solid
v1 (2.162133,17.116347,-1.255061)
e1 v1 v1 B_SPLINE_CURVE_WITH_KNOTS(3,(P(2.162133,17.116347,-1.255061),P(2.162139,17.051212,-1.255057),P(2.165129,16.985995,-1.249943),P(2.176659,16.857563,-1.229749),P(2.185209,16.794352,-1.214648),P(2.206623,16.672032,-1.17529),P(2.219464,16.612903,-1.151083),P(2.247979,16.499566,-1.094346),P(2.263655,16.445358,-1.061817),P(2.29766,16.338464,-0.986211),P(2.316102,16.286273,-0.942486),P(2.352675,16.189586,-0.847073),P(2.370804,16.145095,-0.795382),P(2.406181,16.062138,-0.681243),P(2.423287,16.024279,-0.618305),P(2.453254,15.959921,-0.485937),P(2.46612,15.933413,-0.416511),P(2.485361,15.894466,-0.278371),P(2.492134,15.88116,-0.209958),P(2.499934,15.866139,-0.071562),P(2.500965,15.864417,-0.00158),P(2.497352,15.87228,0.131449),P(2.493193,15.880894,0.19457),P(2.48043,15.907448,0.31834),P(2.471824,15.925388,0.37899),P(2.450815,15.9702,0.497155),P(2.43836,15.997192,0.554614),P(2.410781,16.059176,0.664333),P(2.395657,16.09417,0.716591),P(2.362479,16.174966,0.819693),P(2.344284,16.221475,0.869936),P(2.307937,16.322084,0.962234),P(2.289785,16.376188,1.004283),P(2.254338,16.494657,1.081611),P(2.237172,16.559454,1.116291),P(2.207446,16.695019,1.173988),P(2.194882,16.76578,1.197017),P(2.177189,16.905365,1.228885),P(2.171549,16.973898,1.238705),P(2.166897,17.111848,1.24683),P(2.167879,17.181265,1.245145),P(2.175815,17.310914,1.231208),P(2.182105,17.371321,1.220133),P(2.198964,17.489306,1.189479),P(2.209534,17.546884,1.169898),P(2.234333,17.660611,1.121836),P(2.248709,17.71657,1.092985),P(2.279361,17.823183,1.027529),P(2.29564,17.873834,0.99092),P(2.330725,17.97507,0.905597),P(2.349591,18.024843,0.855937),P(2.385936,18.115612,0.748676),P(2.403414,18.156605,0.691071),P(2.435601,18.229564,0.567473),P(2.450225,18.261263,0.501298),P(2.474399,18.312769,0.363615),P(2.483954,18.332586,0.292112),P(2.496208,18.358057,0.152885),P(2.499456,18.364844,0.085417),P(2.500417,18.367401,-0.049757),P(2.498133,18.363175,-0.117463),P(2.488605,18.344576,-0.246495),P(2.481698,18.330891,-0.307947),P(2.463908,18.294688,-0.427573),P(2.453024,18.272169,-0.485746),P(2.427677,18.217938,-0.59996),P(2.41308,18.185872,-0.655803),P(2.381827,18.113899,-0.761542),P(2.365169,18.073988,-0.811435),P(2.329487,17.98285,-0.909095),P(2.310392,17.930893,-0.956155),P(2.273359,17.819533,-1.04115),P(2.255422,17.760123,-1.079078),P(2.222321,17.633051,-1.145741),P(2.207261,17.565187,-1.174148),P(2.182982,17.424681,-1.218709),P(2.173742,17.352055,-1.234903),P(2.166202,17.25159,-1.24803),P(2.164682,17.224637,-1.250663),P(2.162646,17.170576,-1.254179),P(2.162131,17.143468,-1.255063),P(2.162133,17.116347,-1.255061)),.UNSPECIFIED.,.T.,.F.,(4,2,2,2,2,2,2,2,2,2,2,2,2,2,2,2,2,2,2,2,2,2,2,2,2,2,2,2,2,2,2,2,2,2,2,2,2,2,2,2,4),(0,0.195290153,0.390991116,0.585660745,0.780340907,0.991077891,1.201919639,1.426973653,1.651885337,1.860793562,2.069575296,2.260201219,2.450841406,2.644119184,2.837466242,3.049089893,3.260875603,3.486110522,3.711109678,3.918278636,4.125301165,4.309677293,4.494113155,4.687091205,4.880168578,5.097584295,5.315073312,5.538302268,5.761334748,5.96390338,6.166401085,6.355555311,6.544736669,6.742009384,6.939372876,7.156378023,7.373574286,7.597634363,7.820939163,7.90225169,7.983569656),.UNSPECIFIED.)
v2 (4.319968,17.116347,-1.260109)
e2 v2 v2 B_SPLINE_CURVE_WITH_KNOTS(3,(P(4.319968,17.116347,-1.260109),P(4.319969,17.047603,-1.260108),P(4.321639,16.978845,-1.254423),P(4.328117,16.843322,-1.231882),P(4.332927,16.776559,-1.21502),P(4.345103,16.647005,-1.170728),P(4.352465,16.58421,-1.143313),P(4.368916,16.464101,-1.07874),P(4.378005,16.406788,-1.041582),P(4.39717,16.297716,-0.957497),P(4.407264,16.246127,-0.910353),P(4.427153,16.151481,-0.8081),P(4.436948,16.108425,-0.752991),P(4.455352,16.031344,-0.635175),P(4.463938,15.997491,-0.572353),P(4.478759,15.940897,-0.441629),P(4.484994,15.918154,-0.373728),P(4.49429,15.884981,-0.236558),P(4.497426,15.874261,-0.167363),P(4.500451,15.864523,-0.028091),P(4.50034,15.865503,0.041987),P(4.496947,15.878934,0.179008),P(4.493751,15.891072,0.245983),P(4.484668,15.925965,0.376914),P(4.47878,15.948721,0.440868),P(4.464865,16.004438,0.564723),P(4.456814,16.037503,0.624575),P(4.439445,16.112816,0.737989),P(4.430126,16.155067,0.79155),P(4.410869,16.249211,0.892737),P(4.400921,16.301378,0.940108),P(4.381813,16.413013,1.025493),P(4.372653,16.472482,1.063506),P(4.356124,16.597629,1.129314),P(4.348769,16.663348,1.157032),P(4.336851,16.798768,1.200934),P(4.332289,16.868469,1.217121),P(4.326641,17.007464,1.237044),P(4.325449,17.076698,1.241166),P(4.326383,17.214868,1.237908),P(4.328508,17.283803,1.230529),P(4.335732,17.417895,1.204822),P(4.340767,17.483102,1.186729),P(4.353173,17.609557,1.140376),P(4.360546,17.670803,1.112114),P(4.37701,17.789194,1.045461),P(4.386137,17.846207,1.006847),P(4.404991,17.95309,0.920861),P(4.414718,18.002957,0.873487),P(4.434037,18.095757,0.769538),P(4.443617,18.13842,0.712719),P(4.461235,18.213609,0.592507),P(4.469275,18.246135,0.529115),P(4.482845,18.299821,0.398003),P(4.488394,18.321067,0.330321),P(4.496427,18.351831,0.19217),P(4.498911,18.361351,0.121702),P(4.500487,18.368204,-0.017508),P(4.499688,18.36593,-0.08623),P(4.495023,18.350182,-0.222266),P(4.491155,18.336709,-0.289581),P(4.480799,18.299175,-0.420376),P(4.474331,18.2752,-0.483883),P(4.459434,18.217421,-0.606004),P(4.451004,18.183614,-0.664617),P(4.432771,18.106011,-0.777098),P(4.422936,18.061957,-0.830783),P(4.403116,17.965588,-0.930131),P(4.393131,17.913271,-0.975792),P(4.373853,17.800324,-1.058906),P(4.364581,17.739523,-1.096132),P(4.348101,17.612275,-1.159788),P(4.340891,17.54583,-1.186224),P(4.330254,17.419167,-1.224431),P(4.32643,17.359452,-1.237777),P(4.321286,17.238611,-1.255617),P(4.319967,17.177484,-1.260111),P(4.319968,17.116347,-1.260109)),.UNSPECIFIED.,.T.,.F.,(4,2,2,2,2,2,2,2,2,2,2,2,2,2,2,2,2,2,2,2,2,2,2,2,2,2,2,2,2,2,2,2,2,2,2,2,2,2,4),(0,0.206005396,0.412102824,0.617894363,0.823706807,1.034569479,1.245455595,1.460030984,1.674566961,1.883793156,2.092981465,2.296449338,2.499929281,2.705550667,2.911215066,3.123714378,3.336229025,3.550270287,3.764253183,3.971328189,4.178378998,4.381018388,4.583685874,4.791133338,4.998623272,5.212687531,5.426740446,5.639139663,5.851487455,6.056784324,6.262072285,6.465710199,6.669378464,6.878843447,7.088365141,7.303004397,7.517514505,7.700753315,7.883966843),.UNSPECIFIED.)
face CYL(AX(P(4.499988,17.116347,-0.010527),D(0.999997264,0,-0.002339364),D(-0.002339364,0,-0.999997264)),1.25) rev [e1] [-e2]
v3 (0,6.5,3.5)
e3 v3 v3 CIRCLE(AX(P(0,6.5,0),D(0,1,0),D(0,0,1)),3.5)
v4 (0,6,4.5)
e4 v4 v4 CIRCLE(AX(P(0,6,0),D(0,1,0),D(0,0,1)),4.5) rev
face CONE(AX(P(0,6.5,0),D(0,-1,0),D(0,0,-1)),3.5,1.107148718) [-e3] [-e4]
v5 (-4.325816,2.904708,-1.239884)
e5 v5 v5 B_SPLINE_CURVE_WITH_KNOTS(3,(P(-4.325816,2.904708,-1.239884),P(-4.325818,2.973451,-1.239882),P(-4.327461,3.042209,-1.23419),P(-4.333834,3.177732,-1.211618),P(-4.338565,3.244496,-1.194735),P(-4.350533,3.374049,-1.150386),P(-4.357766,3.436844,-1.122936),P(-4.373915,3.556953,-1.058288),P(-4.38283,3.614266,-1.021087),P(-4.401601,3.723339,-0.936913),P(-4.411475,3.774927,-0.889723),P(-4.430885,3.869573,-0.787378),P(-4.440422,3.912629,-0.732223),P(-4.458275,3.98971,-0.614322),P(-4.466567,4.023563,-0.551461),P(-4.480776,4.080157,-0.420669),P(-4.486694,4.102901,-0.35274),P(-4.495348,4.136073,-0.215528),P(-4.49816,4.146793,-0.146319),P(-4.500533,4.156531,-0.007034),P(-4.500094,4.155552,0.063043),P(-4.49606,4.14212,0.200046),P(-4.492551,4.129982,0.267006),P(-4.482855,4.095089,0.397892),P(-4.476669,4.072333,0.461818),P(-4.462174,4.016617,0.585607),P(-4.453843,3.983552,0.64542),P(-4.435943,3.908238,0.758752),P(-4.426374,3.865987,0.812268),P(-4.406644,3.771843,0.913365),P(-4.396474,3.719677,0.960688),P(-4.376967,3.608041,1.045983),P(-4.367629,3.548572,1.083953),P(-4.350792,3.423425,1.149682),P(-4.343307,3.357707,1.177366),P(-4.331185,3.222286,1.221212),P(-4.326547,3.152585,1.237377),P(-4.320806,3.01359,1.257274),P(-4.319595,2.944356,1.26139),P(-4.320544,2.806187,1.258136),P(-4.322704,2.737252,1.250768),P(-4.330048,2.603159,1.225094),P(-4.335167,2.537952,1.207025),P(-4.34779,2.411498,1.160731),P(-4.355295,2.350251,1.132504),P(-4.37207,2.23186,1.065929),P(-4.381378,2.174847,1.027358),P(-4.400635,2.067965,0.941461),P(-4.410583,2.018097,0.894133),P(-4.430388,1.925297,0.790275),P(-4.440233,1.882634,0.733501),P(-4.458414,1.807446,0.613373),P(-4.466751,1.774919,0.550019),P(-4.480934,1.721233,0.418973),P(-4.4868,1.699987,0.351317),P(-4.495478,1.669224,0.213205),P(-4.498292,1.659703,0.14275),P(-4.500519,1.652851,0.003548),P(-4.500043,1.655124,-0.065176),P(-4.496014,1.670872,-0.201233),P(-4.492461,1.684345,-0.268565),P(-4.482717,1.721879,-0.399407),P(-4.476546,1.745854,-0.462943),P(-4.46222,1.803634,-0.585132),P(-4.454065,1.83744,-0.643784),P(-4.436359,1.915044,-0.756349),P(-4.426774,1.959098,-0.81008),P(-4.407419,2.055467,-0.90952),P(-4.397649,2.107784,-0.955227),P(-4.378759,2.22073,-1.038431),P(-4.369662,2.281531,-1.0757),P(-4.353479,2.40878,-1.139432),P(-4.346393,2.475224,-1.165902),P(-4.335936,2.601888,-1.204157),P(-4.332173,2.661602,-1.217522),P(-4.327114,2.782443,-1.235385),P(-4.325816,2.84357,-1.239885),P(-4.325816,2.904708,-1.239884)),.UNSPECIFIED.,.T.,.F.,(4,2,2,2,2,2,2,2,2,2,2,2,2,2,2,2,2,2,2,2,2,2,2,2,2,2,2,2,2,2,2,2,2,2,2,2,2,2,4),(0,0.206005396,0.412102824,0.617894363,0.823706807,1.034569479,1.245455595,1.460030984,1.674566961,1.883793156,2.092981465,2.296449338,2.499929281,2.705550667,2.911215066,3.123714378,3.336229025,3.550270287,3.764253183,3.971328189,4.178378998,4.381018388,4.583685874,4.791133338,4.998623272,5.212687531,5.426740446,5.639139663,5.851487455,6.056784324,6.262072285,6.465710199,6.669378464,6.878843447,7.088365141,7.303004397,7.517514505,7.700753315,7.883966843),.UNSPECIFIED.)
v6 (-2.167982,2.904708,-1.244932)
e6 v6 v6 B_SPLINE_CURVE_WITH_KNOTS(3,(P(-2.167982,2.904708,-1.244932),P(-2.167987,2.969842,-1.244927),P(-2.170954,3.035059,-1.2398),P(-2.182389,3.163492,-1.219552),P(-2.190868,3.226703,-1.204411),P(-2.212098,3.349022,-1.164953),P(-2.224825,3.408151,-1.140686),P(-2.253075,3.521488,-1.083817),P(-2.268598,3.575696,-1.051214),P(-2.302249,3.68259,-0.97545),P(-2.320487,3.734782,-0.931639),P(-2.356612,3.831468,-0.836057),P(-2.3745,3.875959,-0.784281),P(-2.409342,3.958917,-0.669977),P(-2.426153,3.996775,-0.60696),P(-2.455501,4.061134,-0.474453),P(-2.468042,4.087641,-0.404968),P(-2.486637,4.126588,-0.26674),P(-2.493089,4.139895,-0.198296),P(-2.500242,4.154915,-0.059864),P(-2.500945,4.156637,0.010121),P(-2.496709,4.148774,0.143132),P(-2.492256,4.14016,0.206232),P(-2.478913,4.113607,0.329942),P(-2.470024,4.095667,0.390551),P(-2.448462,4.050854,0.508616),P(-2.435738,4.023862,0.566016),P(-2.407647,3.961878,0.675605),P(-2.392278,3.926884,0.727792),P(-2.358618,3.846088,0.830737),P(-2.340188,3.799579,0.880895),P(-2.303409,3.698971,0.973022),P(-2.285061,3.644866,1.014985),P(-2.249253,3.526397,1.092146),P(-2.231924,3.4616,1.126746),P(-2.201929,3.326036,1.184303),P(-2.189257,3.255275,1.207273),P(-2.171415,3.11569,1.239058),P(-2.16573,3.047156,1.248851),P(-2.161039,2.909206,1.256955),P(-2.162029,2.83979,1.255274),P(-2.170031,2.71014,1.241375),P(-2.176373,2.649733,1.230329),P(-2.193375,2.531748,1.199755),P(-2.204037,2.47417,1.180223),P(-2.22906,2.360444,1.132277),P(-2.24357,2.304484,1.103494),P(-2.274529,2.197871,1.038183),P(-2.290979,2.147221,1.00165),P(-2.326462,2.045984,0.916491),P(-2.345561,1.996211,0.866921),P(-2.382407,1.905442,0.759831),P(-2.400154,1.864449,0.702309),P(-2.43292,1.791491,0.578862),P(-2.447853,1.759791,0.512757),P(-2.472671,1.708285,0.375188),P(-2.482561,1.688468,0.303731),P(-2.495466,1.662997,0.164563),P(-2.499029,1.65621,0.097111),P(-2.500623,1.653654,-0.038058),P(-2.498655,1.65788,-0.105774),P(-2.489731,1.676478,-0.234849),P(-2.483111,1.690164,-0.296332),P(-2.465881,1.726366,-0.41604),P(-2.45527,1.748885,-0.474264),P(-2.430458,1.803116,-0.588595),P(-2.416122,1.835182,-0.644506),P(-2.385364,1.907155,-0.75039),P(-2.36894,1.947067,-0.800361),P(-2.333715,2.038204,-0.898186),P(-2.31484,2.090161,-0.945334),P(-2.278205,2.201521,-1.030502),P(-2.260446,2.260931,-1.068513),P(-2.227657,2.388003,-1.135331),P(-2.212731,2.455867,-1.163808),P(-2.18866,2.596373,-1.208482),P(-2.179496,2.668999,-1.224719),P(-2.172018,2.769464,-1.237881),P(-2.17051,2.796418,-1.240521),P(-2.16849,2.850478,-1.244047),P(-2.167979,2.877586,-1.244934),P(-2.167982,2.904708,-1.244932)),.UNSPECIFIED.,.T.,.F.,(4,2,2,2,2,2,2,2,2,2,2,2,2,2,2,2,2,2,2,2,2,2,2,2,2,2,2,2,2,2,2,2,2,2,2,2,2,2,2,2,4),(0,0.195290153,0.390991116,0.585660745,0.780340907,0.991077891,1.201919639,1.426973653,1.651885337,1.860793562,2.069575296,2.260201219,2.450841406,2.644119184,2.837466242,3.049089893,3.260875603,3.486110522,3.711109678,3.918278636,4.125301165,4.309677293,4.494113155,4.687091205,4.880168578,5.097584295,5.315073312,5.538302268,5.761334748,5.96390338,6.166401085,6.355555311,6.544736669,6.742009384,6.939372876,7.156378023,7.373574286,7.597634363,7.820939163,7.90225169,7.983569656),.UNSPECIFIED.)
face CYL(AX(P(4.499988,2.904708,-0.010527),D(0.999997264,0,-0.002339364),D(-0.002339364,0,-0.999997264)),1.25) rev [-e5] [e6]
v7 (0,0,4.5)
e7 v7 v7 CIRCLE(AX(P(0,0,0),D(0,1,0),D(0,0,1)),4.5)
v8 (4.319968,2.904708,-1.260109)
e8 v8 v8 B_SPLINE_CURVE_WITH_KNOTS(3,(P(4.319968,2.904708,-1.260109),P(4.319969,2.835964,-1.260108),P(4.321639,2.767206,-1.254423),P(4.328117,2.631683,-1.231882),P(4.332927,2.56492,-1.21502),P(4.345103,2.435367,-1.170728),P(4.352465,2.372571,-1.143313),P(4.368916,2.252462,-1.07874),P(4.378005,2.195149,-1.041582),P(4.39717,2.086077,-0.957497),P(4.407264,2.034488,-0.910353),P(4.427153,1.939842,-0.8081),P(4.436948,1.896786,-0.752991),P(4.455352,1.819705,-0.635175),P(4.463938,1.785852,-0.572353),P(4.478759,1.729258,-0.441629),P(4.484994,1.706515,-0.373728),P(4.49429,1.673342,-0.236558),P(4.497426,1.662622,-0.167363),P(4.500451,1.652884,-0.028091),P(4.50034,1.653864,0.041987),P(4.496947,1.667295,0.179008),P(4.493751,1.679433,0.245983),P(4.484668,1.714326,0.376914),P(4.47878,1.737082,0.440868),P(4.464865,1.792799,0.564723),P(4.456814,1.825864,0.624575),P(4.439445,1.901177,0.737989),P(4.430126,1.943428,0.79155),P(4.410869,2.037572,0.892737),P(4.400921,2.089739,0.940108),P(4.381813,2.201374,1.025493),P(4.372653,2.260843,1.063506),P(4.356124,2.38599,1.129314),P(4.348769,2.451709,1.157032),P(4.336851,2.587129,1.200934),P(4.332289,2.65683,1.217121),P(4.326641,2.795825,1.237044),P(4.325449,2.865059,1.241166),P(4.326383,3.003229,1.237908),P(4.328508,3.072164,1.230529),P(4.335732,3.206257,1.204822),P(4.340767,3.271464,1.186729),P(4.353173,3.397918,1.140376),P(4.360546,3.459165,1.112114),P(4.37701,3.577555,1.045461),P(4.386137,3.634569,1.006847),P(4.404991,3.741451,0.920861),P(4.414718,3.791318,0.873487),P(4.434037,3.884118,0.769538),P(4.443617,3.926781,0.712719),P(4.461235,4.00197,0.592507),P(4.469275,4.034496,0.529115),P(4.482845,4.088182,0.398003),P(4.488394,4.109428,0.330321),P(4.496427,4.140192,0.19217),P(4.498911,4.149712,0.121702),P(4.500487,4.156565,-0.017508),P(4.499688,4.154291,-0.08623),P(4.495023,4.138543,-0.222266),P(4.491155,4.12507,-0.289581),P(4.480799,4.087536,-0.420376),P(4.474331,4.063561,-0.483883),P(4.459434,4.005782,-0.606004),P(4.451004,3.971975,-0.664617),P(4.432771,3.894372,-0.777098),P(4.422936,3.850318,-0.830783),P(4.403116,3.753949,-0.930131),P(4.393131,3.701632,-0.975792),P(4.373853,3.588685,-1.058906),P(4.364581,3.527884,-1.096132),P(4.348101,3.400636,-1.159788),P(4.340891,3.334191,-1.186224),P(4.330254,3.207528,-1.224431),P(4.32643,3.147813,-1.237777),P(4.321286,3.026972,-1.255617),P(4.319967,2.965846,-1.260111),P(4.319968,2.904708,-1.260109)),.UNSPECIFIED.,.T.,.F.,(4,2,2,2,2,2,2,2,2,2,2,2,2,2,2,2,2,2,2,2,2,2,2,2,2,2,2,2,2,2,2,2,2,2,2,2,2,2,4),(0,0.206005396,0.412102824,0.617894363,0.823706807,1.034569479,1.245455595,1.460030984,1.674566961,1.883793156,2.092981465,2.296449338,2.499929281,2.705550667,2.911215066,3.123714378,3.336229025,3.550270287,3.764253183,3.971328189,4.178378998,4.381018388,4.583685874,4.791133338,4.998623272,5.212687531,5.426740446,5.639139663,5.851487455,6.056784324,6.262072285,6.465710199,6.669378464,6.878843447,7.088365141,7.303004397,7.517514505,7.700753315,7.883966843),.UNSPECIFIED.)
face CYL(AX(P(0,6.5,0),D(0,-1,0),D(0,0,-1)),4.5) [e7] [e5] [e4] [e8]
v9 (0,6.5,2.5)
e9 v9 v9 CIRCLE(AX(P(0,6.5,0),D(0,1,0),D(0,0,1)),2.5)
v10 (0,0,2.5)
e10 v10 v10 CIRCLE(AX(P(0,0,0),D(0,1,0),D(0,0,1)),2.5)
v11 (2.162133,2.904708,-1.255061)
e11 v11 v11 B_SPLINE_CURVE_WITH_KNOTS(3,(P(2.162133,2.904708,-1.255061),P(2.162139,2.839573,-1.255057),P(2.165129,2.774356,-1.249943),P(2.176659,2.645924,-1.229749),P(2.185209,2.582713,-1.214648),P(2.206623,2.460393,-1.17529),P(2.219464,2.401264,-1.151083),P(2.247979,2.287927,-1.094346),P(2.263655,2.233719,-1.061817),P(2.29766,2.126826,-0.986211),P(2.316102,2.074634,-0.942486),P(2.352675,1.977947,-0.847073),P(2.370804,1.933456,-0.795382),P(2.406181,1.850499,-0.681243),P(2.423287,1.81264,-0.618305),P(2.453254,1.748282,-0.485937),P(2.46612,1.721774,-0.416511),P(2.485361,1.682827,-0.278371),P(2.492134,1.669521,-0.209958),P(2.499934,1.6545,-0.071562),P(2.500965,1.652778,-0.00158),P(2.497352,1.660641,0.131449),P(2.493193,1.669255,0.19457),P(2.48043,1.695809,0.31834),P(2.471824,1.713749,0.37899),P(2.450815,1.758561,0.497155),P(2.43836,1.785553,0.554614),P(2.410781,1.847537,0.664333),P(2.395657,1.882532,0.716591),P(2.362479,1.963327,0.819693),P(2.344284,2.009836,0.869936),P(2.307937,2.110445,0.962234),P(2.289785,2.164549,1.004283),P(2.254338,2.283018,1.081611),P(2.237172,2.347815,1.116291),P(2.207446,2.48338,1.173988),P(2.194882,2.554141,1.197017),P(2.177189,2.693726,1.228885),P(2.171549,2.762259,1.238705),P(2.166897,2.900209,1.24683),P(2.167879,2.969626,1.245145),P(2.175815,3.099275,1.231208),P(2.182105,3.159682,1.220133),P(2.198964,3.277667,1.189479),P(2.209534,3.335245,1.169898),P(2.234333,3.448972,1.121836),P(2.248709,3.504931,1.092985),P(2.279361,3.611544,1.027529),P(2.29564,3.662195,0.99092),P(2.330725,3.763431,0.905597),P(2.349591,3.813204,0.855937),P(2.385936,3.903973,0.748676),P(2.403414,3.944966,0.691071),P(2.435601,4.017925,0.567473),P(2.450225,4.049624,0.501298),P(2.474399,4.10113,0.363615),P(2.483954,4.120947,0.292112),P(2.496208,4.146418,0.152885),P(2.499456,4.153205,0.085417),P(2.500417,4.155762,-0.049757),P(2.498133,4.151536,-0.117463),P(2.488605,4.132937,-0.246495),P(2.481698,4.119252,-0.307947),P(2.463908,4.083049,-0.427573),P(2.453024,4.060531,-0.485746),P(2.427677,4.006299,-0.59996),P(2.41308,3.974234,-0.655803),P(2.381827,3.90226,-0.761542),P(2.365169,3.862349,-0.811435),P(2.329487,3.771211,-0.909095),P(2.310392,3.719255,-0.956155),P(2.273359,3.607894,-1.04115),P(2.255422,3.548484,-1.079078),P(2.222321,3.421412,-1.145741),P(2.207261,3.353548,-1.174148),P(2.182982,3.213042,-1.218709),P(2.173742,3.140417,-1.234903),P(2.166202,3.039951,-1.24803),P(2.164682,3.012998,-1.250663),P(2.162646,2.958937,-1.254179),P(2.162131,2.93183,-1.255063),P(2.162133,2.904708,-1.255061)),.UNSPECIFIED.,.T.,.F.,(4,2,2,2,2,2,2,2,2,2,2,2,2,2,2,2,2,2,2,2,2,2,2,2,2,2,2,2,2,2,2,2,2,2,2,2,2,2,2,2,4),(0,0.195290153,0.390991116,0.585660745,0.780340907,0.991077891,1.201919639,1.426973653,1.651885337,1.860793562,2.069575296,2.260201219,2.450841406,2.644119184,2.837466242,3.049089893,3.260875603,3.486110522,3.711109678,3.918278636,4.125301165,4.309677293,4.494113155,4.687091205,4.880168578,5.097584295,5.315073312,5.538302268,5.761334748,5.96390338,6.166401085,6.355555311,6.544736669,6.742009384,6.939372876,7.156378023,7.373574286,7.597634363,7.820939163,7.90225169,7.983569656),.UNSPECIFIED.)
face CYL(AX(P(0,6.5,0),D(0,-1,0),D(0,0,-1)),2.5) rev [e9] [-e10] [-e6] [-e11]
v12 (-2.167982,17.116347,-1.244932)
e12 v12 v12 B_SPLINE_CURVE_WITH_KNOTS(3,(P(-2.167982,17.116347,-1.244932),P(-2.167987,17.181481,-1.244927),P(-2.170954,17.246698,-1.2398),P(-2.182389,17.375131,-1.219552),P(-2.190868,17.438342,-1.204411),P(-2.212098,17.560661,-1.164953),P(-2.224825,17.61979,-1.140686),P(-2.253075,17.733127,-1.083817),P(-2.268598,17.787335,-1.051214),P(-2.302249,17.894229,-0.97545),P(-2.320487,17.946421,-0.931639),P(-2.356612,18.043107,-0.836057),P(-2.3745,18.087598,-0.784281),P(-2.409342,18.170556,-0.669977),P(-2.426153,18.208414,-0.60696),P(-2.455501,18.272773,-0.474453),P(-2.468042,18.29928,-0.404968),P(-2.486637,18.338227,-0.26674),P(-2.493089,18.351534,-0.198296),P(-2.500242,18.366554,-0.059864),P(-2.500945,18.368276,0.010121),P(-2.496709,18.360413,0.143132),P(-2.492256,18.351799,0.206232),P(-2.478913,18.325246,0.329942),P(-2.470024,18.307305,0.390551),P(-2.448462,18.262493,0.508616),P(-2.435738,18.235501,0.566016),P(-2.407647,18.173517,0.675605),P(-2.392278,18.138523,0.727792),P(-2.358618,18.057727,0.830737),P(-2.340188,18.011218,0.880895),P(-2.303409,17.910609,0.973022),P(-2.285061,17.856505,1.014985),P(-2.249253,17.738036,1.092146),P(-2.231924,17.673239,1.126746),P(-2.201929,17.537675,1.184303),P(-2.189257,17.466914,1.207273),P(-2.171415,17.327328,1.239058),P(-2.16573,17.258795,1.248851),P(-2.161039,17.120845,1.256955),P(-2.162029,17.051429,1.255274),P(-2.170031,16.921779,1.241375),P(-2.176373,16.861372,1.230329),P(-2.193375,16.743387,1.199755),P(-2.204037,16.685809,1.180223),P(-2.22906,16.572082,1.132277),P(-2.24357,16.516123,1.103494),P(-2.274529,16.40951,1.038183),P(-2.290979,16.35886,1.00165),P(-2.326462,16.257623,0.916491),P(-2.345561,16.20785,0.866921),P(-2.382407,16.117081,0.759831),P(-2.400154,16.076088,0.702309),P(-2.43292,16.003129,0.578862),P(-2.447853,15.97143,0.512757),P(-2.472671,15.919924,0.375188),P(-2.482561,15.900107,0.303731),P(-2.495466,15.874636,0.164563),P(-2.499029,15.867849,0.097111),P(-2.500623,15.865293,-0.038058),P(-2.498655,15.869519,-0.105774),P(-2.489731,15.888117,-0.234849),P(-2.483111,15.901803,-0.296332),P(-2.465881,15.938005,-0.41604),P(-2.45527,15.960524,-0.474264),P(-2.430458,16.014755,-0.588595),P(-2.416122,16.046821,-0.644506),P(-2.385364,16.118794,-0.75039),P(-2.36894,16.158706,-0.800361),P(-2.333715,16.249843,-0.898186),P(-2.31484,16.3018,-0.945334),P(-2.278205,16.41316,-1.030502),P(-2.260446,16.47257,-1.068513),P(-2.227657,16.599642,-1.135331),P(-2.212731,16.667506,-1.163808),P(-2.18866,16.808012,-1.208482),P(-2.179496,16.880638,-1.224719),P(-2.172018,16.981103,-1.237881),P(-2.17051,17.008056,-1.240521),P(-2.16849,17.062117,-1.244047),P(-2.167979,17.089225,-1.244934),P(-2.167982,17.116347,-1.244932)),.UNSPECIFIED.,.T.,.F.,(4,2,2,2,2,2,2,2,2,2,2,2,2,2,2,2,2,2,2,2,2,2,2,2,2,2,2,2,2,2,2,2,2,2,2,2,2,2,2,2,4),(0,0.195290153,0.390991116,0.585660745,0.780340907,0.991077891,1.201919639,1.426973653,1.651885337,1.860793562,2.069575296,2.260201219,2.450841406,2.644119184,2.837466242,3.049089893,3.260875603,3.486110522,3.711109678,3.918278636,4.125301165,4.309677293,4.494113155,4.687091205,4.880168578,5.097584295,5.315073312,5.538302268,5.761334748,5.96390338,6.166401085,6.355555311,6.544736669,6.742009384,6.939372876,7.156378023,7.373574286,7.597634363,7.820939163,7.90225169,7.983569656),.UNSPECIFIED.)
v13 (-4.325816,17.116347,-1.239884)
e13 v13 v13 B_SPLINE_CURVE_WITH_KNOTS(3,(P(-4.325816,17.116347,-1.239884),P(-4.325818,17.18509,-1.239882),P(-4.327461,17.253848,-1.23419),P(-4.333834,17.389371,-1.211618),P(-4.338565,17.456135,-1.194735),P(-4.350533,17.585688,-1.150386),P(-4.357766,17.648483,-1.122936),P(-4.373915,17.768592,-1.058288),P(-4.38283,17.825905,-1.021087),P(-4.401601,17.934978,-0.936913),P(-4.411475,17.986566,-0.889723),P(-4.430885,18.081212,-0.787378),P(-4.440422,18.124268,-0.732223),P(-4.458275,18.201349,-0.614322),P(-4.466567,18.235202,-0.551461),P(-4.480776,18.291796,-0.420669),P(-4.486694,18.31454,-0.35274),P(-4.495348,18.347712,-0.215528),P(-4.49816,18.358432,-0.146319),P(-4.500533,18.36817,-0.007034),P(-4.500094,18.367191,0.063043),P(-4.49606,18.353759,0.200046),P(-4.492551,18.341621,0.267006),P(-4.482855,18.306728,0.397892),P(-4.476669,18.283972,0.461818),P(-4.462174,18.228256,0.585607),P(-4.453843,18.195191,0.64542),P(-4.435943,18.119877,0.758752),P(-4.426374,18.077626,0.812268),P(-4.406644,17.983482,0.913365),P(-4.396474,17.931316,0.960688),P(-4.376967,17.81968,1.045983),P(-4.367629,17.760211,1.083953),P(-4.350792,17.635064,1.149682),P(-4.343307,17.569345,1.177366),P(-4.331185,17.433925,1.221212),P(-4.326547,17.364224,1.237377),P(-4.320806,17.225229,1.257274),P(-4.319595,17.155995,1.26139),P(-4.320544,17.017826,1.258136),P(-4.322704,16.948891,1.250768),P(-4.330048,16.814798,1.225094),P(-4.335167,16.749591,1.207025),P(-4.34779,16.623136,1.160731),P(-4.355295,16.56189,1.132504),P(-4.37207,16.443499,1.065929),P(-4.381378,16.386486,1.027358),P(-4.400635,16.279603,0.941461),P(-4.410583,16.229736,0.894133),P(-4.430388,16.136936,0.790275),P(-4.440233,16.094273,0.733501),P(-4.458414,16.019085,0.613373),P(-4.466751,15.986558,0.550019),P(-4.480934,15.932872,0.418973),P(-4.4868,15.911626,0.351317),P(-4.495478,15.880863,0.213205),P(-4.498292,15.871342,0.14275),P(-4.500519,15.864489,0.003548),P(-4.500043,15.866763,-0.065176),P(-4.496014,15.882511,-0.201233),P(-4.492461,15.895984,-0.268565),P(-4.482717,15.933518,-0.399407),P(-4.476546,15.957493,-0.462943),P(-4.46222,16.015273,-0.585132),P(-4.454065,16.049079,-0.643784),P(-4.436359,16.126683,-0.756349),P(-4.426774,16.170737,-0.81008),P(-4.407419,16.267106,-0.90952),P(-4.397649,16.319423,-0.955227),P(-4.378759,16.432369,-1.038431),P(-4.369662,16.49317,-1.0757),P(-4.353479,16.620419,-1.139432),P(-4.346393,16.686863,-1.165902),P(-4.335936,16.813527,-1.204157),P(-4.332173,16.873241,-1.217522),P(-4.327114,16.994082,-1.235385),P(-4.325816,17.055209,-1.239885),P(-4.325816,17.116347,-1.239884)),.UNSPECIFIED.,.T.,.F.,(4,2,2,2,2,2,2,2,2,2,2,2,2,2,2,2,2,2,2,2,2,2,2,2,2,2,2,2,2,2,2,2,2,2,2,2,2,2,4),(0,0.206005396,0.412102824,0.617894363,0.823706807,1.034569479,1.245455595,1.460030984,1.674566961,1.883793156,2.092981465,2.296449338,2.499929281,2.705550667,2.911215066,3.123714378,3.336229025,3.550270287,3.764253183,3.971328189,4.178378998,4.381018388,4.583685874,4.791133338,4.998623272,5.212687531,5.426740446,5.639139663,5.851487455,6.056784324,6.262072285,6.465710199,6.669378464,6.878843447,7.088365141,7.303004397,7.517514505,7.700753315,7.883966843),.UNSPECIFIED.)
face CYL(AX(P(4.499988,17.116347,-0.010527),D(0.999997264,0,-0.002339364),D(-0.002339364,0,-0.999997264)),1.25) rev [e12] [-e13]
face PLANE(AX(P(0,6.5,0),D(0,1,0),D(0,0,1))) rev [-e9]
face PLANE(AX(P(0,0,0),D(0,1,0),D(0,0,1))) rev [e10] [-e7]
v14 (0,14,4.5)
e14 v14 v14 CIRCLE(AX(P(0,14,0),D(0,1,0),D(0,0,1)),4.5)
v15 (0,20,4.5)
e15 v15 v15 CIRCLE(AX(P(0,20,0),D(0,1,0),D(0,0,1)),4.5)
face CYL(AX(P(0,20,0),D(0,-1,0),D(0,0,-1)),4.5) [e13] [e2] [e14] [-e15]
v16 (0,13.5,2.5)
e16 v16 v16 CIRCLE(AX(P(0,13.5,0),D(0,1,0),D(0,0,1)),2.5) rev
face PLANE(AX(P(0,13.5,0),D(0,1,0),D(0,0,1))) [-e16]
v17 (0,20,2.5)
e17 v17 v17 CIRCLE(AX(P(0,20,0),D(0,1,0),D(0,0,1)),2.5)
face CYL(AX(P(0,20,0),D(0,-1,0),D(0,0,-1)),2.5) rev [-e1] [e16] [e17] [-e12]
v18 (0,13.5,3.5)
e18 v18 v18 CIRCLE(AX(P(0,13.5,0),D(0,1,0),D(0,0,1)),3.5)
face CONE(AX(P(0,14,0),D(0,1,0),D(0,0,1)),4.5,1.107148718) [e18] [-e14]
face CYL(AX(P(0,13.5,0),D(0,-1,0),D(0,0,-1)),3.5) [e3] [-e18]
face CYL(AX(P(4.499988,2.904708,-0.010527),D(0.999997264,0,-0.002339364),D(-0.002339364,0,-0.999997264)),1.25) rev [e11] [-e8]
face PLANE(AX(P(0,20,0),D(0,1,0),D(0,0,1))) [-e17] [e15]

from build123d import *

# Parameters (mm, degrees)
SKETCH_1_R         = 4.5
SKETCH_1_R_2       = 2.5
EXTRUDE_1_DEPTH    = 6.5
SKETCH_2_R         = 3.5
EXTRUDE_2_DEPTH    = 7
SKETCH_3_R         = 4.5
SKETCH_3_R_2       = 2.5
EXTRUDE_3_DEPTH    = 6.5
CHAMFER_1_SIZE2    = 1
CHAMFER_1_SIZE     = 0.5
CHAMFER_2_SIZE2    = 0.5
CHAMFER_2_SIZE     = 1
HOLE_WIZARD_M3_1_D = 2.5
HOLE_WIZARD_M3_2_D = 2.5


with BuildPart() as part:
    # 草图1 → 凸台-拉伸1 (new body)
    with BuildSketch(Plane(origin=(0, 0, 0), x_dir=(1, 0, 0), z_dir=(0, 1, 0))):
        with Locations(Location((0, 0, 0), (0, 0, 90))):
            Circle(SKETCH_1_R)
        with Locations(Location((0, 0, 0), (0, 0, 90))):
            Circle(SKETCH_1_R_2, mode=Mode.SUBTRACT)
    extrude(amount=EXTRUDE_1_DEPTH)

    # 草图2 → 凸台-拉伸2 (add)
    with BuildSketch(Plane(origin=(0, 6.5, 0), x_dir=(1, 0, 0), z_dir=(0, 1, 0))):
        with Locations(Location((0, 0, 0), (0, 0, 270))):
            Circle(SKETCH_2_R)
    extrude(amount=EXTRUDE_2_DEPTH)

    # 草图3 → 凸台-拉伸3 (add)
    with BuildSketch(Plane(origin=(0, 13.5, 0), x_dir=(1, 0, 0), z_dir=(0, 1, 0))):
        with Locations(Location((0, 0, 0), (0, 0, 90))):
            Circle(SKETCH_3_R)
        with Locations(Location((0, 0, 0), (0, 0, 90))):
            Circle(SKETCH_3_R_2, mode=Mode.SUBTRACT)
    extrude(amount=EXTRUDE_3_DEPTH)

    # 倒角1
    chamfer_1_edges = [part.edges().sort_by_distance(p)[0] for p in [
        (0, 6.5, 4.5),
    ]]
    chamfer_1_side = [part.faces().sort_by_distance(p)[0] for p in [
        (0, 6.49, 4.5),
    ]]
    chamfer(chamfer_1_edges, length=CHAMFER_1_SIZE - 0.0001, length2=CHAMFER_1_SIZE2 - 0.0001, reference=chamfer_1_side[0])  # a hair under: the kernel refuses the full size

    # 倒角2
    chamfer_2_edges = [part.edges().sort_by_distance(p)[0] for p in [
        (0, 13.5, 4.5),
    ]]
    chamfer_2_side = [part.faces().sort_by_distance(p)[0] for p in [
        (0, 13.5, 4.49),
    ]]
    chamfer(chamfer_2_edges, length=CHAMFER_2_SIZE - 0.0001, length2=CHAMFER_2_SIZE2 - 0.0001, reference=chamfer_2_side[0])  # a hair under: the kernel refuses the full size

    # M3 螺纹孔1 (through all)
    with Locations(Plane(origin=(4.499987687, 2.904707671, -0.01052714), x_dir=(0.002339364434, 0, 0.999997263683), z_dir=(0.999997263683, 0, -0.002339364434))):
        with Locations((0, 0)):
            Hole(HOLE_WIZARD_M3_1_D / 2)

    # M3 螺纹孔2 (through all)
    with Locations(Plane(origin=(4.499987687, 17.116346609, -0.01052714), x_dir=(0.002339364434, 0, 0.999997263683), z_dir=(0.999997263683, 0, -0.002339364434))):
        with Locations((0, 0)):
            Hole(HOLE_WIZARD_M3_2_D / 2)


solid = part.part
